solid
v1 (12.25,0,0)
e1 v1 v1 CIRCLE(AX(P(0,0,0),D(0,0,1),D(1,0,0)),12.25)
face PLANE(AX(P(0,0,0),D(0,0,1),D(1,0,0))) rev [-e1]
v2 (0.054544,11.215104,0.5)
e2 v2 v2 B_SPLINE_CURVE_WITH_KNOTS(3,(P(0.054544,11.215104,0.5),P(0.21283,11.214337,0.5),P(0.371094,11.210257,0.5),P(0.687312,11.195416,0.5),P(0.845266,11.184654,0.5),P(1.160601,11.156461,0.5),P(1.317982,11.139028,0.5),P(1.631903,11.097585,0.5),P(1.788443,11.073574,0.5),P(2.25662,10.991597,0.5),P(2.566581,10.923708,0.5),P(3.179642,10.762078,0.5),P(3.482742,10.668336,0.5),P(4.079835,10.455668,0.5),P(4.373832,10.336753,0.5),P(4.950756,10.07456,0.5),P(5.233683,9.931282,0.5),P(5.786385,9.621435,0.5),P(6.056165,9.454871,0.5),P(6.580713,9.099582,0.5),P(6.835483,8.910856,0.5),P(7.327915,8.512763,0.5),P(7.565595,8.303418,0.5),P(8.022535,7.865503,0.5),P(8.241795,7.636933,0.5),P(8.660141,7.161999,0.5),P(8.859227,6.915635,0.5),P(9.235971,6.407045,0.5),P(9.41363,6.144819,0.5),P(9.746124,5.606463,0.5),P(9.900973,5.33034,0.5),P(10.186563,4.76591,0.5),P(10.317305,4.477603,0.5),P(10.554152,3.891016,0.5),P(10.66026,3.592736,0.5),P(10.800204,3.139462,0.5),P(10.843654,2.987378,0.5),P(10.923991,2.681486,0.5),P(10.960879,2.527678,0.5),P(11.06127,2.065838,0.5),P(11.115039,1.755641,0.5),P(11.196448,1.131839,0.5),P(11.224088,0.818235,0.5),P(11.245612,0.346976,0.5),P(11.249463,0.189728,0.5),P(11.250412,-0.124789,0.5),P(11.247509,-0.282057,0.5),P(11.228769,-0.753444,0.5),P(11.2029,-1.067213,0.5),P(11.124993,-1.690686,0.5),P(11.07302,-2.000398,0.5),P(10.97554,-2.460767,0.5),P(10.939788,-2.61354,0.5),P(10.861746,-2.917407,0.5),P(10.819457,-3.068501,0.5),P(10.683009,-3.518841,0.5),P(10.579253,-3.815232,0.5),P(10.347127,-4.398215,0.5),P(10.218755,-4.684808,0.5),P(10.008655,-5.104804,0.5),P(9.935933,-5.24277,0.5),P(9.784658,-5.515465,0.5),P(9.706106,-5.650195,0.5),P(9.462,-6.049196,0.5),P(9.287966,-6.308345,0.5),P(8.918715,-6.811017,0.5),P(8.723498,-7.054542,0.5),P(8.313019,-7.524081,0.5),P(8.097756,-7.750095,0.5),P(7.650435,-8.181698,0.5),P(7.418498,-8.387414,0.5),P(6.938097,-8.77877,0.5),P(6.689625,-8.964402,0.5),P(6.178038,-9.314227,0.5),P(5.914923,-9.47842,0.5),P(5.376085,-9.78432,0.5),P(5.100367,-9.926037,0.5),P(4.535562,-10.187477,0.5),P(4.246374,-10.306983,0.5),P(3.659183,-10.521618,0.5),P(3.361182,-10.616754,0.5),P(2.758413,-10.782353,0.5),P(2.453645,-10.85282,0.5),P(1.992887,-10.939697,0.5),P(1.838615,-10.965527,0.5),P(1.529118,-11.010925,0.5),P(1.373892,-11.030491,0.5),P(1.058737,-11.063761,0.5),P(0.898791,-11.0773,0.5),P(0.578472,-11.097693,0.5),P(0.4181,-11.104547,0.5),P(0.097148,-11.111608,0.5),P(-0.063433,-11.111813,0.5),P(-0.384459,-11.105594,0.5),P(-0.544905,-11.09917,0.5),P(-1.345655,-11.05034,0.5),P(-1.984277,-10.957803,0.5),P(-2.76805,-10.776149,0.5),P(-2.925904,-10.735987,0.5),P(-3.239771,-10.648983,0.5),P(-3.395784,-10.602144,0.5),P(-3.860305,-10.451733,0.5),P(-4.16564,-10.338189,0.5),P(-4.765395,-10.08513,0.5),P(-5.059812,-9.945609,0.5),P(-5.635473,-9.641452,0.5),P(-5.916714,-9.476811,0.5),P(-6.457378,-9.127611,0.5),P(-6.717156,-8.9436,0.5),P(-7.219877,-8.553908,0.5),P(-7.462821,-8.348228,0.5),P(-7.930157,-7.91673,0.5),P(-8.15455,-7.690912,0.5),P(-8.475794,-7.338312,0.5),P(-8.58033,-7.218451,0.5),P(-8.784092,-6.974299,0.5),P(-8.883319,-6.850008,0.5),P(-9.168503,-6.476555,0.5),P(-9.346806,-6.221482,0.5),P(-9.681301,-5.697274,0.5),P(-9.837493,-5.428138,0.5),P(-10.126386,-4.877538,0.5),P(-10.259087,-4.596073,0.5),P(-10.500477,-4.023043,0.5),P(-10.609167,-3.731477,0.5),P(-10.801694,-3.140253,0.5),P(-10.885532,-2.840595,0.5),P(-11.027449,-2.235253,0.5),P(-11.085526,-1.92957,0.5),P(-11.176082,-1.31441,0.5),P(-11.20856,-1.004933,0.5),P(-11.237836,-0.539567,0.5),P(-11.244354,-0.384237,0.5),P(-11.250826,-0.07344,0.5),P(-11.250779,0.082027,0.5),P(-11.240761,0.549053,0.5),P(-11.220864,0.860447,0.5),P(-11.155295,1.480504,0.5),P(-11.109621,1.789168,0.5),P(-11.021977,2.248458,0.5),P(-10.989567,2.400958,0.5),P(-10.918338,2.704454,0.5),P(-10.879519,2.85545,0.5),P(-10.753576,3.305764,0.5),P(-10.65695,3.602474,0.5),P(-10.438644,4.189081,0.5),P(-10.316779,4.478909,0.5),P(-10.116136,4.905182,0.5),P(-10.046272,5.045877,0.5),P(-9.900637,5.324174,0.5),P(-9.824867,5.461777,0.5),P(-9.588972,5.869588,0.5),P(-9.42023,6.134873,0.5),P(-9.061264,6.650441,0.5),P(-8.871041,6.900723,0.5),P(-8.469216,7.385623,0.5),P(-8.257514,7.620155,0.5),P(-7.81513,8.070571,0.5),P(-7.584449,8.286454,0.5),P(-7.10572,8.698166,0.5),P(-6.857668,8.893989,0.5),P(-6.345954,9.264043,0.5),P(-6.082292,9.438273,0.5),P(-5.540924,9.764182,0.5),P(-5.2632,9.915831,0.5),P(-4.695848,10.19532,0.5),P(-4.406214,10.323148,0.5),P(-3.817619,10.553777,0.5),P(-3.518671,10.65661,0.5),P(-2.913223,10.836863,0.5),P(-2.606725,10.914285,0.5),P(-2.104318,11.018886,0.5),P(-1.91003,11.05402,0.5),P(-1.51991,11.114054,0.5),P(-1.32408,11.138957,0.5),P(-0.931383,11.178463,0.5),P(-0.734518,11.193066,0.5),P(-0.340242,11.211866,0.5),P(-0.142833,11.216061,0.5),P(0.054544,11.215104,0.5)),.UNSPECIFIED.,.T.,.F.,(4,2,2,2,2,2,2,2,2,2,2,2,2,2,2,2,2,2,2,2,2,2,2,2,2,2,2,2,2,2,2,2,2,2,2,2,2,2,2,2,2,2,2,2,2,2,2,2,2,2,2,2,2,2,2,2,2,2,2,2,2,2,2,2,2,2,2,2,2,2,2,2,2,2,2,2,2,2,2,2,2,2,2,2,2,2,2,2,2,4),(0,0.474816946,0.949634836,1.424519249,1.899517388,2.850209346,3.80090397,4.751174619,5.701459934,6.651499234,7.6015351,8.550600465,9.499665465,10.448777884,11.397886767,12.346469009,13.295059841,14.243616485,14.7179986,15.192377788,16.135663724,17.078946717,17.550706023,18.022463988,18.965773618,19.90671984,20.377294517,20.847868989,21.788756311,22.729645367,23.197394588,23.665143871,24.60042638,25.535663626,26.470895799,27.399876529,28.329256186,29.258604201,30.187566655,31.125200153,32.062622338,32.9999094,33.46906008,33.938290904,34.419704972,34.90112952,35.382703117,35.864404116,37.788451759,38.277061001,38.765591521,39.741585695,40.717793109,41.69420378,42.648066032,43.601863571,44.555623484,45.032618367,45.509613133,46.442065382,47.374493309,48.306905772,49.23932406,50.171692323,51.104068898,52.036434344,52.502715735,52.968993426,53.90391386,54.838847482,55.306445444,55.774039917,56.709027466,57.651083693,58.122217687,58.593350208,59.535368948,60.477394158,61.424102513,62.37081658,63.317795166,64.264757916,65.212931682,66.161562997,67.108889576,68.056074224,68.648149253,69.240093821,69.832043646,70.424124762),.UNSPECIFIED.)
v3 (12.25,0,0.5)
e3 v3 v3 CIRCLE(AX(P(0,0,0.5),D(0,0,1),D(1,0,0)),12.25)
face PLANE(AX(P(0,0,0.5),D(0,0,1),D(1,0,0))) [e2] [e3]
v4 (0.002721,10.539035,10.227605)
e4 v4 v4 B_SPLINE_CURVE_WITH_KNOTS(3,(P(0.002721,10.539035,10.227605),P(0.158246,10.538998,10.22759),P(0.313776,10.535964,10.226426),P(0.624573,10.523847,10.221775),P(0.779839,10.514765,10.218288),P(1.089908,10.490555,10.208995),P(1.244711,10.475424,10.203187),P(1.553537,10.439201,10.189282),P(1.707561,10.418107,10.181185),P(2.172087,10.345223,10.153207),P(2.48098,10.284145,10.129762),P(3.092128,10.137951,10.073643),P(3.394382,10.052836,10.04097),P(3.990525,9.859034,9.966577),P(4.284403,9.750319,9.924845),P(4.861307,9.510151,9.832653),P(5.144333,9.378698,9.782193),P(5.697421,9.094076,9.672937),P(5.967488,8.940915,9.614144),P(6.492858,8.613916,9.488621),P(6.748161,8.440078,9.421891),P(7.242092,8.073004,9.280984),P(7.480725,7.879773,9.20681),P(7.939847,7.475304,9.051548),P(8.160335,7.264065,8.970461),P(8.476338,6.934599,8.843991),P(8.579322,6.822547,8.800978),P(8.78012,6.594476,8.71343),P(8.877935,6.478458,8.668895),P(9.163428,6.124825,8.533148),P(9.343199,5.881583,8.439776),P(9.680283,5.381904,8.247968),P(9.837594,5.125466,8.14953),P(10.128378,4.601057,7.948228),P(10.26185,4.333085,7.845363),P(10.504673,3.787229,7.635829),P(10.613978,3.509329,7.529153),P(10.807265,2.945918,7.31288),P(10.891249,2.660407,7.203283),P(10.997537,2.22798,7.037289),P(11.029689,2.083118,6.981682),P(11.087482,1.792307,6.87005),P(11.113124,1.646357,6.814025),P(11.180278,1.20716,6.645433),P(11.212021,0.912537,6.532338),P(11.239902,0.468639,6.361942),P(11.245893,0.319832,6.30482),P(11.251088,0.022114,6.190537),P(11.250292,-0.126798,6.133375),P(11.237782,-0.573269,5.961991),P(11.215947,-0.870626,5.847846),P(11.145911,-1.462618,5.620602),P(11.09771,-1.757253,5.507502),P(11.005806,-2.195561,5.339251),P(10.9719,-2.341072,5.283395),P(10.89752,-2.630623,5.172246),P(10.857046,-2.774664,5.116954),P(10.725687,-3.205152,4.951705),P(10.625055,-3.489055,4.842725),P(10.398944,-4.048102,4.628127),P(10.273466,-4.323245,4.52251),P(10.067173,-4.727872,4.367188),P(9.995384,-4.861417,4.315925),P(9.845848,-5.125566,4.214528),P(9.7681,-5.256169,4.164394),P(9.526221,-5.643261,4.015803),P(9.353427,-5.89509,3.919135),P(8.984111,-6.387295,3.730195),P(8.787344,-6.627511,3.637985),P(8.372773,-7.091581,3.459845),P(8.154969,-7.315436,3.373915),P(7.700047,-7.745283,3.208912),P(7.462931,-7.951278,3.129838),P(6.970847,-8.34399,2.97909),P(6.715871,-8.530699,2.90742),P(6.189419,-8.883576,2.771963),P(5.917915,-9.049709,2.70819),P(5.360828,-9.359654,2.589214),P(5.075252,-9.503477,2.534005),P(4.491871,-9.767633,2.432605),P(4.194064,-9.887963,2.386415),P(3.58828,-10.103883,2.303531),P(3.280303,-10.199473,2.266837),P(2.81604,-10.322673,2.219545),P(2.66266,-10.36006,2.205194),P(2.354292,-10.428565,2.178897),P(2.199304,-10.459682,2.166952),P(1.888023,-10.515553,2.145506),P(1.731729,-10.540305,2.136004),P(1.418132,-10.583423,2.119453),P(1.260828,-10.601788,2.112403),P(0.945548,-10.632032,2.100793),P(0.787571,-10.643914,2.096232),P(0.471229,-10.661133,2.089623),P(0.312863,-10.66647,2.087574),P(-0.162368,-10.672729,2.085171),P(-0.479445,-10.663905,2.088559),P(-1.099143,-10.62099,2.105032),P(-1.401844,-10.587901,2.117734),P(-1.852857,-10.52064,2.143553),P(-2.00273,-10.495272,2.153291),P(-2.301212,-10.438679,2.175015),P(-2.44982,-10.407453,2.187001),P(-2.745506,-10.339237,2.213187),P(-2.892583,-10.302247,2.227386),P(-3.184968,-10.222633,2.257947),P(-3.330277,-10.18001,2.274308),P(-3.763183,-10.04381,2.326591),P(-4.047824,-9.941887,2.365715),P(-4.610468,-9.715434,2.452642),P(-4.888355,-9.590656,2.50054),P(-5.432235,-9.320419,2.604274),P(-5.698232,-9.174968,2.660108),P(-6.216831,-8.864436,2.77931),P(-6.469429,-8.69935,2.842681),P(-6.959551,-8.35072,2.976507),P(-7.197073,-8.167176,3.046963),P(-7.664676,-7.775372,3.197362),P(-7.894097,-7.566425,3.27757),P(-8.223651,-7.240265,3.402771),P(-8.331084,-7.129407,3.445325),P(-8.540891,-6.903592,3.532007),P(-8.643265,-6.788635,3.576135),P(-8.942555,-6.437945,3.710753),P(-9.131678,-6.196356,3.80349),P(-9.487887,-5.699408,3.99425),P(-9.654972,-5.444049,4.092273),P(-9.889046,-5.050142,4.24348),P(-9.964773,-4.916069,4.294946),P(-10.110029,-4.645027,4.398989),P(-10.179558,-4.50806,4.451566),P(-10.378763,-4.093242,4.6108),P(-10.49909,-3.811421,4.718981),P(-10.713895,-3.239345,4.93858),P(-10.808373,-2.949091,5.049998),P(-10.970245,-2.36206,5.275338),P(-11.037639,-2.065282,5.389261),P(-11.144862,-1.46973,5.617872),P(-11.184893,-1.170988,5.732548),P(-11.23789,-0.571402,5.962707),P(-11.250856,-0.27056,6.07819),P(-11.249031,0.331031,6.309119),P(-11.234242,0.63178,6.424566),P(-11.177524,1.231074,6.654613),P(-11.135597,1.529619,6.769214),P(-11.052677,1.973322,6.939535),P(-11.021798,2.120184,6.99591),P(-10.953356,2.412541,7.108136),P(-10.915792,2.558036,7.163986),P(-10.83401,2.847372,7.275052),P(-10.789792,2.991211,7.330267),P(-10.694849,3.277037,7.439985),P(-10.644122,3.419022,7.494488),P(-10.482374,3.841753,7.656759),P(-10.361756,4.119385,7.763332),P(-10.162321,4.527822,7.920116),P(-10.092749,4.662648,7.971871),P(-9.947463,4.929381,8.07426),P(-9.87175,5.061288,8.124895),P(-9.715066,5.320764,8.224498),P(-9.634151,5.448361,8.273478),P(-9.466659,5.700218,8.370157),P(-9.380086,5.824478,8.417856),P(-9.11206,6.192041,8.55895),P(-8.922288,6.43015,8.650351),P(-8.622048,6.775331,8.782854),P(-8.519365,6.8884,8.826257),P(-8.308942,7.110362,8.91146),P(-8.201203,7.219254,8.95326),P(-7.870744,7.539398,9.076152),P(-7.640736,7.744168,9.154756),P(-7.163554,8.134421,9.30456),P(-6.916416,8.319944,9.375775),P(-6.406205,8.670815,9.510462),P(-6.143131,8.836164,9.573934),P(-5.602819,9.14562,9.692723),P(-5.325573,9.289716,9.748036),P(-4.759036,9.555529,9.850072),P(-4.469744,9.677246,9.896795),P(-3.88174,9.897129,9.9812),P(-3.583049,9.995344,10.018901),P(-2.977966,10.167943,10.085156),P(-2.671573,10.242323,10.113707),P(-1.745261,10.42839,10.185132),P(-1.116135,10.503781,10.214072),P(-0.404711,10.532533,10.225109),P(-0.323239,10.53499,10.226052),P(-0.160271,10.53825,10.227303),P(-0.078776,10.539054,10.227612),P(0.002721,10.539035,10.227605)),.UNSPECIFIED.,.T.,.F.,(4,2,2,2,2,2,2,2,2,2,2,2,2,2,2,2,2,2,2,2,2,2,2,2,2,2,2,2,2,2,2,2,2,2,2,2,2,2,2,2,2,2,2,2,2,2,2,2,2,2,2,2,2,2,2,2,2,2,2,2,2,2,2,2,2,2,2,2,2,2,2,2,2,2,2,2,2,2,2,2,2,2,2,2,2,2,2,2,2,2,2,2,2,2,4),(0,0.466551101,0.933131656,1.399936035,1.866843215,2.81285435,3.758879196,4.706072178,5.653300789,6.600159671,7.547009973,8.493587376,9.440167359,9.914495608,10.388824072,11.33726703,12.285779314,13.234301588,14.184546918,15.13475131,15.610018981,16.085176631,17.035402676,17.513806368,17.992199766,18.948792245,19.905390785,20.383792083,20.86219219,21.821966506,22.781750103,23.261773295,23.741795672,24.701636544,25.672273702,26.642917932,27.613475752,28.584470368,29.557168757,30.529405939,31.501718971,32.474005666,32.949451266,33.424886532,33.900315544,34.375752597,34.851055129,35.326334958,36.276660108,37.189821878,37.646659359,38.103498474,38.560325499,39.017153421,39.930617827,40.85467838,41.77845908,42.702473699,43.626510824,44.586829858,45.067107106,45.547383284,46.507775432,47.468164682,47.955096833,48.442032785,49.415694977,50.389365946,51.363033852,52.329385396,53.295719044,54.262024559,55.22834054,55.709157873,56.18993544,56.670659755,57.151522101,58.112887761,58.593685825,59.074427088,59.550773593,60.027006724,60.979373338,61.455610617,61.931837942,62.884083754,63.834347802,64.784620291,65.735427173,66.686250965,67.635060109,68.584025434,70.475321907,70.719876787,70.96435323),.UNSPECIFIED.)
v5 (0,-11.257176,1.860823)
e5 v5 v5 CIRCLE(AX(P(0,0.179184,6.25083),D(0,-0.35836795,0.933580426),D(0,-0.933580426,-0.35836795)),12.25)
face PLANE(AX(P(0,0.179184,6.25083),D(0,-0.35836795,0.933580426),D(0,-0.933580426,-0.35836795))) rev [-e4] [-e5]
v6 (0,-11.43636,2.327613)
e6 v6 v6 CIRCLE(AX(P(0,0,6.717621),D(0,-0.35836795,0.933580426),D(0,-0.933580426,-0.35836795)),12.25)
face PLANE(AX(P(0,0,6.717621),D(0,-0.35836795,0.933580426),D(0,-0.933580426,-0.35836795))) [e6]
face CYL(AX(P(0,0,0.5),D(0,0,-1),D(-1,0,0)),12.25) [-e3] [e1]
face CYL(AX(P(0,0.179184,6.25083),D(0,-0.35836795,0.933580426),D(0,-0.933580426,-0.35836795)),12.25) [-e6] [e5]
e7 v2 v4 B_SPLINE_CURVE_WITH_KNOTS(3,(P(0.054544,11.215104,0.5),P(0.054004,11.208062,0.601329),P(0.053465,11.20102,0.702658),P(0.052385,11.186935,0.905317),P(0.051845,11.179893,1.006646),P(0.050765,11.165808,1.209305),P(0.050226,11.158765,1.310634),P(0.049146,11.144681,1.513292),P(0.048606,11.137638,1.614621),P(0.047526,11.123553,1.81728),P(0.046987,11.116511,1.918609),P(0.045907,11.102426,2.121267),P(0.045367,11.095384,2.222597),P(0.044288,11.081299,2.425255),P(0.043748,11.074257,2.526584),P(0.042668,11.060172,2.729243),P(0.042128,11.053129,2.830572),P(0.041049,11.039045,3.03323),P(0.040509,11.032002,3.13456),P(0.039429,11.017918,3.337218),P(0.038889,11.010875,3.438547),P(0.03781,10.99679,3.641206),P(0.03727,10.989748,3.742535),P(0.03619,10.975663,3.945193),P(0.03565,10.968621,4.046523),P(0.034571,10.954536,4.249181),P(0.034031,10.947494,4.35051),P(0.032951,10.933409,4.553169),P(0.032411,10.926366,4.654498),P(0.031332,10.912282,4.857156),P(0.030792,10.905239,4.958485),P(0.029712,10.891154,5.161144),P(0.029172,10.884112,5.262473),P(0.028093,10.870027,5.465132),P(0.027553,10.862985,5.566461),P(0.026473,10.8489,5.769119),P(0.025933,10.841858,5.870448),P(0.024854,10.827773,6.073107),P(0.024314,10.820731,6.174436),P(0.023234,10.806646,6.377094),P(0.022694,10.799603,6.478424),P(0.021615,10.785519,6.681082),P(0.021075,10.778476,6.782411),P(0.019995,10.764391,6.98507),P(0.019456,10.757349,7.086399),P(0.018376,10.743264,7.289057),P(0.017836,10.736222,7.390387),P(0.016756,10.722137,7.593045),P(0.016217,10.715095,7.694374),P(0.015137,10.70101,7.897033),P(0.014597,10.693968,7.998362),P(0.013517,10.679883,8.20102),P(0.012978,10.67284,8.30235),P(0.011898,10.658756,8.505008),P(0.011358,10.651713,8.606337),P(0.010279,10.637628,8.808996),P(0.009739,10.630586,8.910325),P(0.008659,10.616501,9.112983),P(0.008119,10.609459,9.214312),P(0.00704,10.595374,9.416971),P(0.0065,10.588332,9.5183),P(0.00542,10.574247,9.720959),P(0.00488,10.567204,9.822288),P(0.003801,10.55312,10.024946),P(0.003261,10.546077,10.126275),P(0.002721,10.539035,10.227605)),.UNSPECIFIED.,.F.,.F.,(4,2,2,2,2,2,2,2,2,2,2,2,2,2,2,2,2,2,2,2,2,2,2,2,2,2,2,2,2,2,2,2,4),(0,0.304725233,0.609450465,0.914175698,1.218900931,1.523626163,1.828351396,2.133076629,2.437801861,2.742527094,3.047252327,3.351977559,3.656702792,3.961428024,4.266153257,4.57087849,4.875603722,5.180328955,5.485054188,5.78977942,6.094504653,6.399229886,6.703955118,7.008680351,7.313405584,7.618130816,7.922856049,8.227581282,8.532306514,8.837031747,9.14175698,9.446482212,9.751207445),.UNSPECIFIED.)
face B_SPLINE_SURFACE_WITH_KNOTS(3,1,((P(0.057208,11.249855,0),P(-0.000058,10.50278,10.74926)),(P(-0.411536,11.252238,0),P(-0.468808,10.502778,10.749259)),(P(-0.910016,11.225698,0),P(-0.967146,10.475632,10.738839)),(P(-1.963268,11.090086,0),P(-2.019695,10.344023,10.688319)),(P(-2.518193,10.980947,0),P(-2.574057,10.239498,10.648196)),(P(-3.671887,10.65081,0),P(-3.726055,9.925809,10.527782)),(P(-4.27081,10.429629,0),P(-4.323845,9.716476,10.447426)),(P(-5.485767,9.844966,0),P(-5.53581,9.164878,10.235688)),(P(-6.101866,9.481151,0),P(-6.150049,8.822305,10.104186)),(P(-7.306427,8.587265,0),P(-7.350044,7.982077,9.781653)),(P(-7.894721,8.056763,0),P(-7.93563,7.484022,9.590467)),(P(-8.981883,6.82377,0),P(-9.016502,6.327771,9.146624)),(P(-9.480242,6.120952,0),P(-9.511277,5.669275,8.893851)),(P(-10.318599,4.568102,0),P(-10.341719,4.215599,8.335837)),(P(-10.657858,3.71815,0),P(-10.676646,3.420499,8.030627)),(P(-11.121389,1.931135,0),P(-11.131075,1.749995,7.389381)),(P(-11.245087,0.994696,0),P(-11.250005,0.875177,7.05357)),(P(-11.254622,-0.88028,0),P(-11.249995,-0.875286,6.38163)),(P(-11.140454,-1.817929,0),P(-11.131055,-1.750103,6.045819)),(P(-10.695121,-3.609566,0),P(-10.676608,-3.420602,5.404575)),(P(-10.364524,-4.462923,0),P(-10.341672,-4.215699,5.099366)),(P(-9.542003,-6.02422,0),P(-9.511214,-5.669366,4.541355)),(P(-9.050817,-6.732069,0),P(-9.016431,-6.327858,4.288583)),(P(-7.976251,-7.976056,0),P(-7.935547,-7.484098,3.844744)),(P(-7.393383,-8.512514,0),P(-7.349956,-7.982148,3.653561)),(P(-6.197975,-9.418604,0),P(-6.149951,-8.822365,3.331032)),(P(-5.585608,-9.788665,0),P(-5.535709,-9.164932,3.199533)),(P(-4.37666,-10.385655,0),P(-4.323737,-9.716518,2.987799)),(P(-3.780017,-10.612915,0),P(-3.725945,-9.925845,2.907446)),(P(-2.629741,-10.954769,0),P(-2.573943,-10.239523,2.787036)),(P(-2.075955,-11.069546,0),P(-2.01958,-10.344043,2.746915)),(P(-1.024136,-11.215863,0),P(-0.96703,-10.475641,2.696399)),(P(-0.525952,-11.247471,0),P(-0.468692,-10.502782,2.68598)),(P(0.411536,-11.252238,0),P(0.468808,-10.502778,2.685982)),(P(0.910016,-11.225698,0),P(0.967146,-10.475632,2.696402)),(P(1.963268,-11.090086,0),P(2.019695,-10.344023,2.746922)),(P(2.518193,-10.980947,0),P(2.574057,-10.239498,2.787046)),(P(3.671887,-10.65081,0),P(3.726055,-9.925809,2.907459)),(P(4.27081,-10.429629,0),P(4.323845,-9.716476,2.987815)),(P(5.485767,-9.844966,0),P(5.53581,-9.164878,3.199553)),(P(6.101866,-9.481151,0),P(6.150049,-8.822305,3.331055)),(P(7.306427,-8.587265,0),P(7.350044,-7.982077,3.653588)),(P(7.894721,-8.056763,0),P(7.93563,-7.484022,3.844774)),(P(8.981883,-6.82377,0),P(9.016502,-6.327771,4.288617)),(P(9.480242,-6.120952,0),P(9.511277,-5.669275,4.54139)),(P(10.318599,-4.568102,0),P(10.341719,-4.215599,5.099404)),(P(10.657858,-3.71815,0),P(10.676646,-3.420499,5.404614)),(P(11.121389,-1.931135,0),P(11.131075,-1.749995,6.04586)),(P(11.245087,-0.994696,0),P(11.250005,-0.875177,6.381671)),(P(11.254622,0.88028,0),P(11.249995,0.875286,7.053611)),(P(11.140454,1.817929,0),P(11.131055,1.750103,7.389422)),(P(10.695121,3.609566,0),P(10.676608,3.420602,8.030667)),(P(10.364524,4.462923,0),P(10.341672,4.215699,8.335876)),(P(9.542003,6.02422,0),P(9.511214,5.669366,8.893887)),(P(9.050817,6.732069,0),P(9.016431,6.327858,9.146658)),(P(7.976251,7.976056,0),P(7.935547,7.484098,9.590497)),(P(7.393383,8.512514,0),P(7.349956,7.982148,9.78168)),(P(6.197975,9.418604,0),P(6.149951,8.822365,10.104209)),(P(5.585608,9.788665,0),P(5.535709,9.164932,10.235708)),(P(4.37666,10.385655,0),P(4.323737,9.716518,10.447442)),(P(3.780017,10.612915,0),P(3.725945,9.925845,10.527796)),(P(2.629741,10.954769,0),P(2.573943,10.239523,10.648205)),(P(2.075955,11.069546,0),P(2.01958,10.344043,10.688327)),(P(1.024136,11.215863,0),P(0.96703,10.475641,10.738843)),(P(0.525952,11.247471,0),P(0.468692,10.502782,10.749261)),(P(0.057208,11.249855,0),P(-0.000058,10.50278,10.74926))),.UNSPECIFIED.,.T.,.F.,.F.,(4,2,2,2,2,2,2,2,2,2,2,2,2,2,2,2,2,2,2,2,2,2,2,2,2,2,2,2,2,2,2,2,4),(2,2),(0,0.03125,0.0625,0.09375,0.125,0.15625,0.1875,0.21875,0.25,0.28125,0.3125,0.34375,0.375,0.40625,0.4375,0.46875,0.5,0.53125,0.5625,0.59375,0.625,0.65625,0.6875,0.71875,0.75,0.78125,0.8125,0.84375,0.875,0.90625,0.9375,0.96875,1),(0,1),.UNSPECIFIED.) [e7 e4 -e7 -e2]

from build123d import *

# Parameters (mm, degrees)
SKETCH1_R           = 11.25
SKETCH3_R           = 11.25
SKETCH3_5_R         = 12.25
BOSS_EXTRUDE1_DEPTH = 0.5
SKETCH1_4_R         = 12.25
BOSS_EXTRUDE2_DEPTH = 0.5


with BuildPart() as part:
    # Sketch1 → Loft1 section 0
    with BuildSketch(Plane.XY):
        Circle(SKETCH1_R)
    # Sketch3 → Loft1 section 1
    with BuildSketch(Plane(origin=(0, -2.247482777, 5.854892806), x_dir=(1, 0, 0), z_dir=(0, -0.358367949545301, 0.9335804264972015))):
        with Locations((0, 2.407379925)):
            Circle(SKETCH3_R)
    loft()

    # Sketch3<5> → Boss-Extrude1 (add)
    with BuildSketch(Plane(origin=(0, -2.247482777, 5.854892806), x_dir=(1, 0, 0), z_dir=(0, -0.358367949545301, 0.9335804264972015))):
        with Locations(Location((0, 2.407379925, 0), (0, 0, 270))):
            Circle(SKETCH3_5_R)
    extrude(amount=-BOSS_EXTRUDE1_DEPTH)

    # Sketch1<4> → Boss-Extrude2 (add)
    with BuildSketch(Plane.XY):
        Circle(SKETCH1_4_R)
    extrude(amount=BOSS_EXTRUDE2_DEPTH)


solid = part.part
